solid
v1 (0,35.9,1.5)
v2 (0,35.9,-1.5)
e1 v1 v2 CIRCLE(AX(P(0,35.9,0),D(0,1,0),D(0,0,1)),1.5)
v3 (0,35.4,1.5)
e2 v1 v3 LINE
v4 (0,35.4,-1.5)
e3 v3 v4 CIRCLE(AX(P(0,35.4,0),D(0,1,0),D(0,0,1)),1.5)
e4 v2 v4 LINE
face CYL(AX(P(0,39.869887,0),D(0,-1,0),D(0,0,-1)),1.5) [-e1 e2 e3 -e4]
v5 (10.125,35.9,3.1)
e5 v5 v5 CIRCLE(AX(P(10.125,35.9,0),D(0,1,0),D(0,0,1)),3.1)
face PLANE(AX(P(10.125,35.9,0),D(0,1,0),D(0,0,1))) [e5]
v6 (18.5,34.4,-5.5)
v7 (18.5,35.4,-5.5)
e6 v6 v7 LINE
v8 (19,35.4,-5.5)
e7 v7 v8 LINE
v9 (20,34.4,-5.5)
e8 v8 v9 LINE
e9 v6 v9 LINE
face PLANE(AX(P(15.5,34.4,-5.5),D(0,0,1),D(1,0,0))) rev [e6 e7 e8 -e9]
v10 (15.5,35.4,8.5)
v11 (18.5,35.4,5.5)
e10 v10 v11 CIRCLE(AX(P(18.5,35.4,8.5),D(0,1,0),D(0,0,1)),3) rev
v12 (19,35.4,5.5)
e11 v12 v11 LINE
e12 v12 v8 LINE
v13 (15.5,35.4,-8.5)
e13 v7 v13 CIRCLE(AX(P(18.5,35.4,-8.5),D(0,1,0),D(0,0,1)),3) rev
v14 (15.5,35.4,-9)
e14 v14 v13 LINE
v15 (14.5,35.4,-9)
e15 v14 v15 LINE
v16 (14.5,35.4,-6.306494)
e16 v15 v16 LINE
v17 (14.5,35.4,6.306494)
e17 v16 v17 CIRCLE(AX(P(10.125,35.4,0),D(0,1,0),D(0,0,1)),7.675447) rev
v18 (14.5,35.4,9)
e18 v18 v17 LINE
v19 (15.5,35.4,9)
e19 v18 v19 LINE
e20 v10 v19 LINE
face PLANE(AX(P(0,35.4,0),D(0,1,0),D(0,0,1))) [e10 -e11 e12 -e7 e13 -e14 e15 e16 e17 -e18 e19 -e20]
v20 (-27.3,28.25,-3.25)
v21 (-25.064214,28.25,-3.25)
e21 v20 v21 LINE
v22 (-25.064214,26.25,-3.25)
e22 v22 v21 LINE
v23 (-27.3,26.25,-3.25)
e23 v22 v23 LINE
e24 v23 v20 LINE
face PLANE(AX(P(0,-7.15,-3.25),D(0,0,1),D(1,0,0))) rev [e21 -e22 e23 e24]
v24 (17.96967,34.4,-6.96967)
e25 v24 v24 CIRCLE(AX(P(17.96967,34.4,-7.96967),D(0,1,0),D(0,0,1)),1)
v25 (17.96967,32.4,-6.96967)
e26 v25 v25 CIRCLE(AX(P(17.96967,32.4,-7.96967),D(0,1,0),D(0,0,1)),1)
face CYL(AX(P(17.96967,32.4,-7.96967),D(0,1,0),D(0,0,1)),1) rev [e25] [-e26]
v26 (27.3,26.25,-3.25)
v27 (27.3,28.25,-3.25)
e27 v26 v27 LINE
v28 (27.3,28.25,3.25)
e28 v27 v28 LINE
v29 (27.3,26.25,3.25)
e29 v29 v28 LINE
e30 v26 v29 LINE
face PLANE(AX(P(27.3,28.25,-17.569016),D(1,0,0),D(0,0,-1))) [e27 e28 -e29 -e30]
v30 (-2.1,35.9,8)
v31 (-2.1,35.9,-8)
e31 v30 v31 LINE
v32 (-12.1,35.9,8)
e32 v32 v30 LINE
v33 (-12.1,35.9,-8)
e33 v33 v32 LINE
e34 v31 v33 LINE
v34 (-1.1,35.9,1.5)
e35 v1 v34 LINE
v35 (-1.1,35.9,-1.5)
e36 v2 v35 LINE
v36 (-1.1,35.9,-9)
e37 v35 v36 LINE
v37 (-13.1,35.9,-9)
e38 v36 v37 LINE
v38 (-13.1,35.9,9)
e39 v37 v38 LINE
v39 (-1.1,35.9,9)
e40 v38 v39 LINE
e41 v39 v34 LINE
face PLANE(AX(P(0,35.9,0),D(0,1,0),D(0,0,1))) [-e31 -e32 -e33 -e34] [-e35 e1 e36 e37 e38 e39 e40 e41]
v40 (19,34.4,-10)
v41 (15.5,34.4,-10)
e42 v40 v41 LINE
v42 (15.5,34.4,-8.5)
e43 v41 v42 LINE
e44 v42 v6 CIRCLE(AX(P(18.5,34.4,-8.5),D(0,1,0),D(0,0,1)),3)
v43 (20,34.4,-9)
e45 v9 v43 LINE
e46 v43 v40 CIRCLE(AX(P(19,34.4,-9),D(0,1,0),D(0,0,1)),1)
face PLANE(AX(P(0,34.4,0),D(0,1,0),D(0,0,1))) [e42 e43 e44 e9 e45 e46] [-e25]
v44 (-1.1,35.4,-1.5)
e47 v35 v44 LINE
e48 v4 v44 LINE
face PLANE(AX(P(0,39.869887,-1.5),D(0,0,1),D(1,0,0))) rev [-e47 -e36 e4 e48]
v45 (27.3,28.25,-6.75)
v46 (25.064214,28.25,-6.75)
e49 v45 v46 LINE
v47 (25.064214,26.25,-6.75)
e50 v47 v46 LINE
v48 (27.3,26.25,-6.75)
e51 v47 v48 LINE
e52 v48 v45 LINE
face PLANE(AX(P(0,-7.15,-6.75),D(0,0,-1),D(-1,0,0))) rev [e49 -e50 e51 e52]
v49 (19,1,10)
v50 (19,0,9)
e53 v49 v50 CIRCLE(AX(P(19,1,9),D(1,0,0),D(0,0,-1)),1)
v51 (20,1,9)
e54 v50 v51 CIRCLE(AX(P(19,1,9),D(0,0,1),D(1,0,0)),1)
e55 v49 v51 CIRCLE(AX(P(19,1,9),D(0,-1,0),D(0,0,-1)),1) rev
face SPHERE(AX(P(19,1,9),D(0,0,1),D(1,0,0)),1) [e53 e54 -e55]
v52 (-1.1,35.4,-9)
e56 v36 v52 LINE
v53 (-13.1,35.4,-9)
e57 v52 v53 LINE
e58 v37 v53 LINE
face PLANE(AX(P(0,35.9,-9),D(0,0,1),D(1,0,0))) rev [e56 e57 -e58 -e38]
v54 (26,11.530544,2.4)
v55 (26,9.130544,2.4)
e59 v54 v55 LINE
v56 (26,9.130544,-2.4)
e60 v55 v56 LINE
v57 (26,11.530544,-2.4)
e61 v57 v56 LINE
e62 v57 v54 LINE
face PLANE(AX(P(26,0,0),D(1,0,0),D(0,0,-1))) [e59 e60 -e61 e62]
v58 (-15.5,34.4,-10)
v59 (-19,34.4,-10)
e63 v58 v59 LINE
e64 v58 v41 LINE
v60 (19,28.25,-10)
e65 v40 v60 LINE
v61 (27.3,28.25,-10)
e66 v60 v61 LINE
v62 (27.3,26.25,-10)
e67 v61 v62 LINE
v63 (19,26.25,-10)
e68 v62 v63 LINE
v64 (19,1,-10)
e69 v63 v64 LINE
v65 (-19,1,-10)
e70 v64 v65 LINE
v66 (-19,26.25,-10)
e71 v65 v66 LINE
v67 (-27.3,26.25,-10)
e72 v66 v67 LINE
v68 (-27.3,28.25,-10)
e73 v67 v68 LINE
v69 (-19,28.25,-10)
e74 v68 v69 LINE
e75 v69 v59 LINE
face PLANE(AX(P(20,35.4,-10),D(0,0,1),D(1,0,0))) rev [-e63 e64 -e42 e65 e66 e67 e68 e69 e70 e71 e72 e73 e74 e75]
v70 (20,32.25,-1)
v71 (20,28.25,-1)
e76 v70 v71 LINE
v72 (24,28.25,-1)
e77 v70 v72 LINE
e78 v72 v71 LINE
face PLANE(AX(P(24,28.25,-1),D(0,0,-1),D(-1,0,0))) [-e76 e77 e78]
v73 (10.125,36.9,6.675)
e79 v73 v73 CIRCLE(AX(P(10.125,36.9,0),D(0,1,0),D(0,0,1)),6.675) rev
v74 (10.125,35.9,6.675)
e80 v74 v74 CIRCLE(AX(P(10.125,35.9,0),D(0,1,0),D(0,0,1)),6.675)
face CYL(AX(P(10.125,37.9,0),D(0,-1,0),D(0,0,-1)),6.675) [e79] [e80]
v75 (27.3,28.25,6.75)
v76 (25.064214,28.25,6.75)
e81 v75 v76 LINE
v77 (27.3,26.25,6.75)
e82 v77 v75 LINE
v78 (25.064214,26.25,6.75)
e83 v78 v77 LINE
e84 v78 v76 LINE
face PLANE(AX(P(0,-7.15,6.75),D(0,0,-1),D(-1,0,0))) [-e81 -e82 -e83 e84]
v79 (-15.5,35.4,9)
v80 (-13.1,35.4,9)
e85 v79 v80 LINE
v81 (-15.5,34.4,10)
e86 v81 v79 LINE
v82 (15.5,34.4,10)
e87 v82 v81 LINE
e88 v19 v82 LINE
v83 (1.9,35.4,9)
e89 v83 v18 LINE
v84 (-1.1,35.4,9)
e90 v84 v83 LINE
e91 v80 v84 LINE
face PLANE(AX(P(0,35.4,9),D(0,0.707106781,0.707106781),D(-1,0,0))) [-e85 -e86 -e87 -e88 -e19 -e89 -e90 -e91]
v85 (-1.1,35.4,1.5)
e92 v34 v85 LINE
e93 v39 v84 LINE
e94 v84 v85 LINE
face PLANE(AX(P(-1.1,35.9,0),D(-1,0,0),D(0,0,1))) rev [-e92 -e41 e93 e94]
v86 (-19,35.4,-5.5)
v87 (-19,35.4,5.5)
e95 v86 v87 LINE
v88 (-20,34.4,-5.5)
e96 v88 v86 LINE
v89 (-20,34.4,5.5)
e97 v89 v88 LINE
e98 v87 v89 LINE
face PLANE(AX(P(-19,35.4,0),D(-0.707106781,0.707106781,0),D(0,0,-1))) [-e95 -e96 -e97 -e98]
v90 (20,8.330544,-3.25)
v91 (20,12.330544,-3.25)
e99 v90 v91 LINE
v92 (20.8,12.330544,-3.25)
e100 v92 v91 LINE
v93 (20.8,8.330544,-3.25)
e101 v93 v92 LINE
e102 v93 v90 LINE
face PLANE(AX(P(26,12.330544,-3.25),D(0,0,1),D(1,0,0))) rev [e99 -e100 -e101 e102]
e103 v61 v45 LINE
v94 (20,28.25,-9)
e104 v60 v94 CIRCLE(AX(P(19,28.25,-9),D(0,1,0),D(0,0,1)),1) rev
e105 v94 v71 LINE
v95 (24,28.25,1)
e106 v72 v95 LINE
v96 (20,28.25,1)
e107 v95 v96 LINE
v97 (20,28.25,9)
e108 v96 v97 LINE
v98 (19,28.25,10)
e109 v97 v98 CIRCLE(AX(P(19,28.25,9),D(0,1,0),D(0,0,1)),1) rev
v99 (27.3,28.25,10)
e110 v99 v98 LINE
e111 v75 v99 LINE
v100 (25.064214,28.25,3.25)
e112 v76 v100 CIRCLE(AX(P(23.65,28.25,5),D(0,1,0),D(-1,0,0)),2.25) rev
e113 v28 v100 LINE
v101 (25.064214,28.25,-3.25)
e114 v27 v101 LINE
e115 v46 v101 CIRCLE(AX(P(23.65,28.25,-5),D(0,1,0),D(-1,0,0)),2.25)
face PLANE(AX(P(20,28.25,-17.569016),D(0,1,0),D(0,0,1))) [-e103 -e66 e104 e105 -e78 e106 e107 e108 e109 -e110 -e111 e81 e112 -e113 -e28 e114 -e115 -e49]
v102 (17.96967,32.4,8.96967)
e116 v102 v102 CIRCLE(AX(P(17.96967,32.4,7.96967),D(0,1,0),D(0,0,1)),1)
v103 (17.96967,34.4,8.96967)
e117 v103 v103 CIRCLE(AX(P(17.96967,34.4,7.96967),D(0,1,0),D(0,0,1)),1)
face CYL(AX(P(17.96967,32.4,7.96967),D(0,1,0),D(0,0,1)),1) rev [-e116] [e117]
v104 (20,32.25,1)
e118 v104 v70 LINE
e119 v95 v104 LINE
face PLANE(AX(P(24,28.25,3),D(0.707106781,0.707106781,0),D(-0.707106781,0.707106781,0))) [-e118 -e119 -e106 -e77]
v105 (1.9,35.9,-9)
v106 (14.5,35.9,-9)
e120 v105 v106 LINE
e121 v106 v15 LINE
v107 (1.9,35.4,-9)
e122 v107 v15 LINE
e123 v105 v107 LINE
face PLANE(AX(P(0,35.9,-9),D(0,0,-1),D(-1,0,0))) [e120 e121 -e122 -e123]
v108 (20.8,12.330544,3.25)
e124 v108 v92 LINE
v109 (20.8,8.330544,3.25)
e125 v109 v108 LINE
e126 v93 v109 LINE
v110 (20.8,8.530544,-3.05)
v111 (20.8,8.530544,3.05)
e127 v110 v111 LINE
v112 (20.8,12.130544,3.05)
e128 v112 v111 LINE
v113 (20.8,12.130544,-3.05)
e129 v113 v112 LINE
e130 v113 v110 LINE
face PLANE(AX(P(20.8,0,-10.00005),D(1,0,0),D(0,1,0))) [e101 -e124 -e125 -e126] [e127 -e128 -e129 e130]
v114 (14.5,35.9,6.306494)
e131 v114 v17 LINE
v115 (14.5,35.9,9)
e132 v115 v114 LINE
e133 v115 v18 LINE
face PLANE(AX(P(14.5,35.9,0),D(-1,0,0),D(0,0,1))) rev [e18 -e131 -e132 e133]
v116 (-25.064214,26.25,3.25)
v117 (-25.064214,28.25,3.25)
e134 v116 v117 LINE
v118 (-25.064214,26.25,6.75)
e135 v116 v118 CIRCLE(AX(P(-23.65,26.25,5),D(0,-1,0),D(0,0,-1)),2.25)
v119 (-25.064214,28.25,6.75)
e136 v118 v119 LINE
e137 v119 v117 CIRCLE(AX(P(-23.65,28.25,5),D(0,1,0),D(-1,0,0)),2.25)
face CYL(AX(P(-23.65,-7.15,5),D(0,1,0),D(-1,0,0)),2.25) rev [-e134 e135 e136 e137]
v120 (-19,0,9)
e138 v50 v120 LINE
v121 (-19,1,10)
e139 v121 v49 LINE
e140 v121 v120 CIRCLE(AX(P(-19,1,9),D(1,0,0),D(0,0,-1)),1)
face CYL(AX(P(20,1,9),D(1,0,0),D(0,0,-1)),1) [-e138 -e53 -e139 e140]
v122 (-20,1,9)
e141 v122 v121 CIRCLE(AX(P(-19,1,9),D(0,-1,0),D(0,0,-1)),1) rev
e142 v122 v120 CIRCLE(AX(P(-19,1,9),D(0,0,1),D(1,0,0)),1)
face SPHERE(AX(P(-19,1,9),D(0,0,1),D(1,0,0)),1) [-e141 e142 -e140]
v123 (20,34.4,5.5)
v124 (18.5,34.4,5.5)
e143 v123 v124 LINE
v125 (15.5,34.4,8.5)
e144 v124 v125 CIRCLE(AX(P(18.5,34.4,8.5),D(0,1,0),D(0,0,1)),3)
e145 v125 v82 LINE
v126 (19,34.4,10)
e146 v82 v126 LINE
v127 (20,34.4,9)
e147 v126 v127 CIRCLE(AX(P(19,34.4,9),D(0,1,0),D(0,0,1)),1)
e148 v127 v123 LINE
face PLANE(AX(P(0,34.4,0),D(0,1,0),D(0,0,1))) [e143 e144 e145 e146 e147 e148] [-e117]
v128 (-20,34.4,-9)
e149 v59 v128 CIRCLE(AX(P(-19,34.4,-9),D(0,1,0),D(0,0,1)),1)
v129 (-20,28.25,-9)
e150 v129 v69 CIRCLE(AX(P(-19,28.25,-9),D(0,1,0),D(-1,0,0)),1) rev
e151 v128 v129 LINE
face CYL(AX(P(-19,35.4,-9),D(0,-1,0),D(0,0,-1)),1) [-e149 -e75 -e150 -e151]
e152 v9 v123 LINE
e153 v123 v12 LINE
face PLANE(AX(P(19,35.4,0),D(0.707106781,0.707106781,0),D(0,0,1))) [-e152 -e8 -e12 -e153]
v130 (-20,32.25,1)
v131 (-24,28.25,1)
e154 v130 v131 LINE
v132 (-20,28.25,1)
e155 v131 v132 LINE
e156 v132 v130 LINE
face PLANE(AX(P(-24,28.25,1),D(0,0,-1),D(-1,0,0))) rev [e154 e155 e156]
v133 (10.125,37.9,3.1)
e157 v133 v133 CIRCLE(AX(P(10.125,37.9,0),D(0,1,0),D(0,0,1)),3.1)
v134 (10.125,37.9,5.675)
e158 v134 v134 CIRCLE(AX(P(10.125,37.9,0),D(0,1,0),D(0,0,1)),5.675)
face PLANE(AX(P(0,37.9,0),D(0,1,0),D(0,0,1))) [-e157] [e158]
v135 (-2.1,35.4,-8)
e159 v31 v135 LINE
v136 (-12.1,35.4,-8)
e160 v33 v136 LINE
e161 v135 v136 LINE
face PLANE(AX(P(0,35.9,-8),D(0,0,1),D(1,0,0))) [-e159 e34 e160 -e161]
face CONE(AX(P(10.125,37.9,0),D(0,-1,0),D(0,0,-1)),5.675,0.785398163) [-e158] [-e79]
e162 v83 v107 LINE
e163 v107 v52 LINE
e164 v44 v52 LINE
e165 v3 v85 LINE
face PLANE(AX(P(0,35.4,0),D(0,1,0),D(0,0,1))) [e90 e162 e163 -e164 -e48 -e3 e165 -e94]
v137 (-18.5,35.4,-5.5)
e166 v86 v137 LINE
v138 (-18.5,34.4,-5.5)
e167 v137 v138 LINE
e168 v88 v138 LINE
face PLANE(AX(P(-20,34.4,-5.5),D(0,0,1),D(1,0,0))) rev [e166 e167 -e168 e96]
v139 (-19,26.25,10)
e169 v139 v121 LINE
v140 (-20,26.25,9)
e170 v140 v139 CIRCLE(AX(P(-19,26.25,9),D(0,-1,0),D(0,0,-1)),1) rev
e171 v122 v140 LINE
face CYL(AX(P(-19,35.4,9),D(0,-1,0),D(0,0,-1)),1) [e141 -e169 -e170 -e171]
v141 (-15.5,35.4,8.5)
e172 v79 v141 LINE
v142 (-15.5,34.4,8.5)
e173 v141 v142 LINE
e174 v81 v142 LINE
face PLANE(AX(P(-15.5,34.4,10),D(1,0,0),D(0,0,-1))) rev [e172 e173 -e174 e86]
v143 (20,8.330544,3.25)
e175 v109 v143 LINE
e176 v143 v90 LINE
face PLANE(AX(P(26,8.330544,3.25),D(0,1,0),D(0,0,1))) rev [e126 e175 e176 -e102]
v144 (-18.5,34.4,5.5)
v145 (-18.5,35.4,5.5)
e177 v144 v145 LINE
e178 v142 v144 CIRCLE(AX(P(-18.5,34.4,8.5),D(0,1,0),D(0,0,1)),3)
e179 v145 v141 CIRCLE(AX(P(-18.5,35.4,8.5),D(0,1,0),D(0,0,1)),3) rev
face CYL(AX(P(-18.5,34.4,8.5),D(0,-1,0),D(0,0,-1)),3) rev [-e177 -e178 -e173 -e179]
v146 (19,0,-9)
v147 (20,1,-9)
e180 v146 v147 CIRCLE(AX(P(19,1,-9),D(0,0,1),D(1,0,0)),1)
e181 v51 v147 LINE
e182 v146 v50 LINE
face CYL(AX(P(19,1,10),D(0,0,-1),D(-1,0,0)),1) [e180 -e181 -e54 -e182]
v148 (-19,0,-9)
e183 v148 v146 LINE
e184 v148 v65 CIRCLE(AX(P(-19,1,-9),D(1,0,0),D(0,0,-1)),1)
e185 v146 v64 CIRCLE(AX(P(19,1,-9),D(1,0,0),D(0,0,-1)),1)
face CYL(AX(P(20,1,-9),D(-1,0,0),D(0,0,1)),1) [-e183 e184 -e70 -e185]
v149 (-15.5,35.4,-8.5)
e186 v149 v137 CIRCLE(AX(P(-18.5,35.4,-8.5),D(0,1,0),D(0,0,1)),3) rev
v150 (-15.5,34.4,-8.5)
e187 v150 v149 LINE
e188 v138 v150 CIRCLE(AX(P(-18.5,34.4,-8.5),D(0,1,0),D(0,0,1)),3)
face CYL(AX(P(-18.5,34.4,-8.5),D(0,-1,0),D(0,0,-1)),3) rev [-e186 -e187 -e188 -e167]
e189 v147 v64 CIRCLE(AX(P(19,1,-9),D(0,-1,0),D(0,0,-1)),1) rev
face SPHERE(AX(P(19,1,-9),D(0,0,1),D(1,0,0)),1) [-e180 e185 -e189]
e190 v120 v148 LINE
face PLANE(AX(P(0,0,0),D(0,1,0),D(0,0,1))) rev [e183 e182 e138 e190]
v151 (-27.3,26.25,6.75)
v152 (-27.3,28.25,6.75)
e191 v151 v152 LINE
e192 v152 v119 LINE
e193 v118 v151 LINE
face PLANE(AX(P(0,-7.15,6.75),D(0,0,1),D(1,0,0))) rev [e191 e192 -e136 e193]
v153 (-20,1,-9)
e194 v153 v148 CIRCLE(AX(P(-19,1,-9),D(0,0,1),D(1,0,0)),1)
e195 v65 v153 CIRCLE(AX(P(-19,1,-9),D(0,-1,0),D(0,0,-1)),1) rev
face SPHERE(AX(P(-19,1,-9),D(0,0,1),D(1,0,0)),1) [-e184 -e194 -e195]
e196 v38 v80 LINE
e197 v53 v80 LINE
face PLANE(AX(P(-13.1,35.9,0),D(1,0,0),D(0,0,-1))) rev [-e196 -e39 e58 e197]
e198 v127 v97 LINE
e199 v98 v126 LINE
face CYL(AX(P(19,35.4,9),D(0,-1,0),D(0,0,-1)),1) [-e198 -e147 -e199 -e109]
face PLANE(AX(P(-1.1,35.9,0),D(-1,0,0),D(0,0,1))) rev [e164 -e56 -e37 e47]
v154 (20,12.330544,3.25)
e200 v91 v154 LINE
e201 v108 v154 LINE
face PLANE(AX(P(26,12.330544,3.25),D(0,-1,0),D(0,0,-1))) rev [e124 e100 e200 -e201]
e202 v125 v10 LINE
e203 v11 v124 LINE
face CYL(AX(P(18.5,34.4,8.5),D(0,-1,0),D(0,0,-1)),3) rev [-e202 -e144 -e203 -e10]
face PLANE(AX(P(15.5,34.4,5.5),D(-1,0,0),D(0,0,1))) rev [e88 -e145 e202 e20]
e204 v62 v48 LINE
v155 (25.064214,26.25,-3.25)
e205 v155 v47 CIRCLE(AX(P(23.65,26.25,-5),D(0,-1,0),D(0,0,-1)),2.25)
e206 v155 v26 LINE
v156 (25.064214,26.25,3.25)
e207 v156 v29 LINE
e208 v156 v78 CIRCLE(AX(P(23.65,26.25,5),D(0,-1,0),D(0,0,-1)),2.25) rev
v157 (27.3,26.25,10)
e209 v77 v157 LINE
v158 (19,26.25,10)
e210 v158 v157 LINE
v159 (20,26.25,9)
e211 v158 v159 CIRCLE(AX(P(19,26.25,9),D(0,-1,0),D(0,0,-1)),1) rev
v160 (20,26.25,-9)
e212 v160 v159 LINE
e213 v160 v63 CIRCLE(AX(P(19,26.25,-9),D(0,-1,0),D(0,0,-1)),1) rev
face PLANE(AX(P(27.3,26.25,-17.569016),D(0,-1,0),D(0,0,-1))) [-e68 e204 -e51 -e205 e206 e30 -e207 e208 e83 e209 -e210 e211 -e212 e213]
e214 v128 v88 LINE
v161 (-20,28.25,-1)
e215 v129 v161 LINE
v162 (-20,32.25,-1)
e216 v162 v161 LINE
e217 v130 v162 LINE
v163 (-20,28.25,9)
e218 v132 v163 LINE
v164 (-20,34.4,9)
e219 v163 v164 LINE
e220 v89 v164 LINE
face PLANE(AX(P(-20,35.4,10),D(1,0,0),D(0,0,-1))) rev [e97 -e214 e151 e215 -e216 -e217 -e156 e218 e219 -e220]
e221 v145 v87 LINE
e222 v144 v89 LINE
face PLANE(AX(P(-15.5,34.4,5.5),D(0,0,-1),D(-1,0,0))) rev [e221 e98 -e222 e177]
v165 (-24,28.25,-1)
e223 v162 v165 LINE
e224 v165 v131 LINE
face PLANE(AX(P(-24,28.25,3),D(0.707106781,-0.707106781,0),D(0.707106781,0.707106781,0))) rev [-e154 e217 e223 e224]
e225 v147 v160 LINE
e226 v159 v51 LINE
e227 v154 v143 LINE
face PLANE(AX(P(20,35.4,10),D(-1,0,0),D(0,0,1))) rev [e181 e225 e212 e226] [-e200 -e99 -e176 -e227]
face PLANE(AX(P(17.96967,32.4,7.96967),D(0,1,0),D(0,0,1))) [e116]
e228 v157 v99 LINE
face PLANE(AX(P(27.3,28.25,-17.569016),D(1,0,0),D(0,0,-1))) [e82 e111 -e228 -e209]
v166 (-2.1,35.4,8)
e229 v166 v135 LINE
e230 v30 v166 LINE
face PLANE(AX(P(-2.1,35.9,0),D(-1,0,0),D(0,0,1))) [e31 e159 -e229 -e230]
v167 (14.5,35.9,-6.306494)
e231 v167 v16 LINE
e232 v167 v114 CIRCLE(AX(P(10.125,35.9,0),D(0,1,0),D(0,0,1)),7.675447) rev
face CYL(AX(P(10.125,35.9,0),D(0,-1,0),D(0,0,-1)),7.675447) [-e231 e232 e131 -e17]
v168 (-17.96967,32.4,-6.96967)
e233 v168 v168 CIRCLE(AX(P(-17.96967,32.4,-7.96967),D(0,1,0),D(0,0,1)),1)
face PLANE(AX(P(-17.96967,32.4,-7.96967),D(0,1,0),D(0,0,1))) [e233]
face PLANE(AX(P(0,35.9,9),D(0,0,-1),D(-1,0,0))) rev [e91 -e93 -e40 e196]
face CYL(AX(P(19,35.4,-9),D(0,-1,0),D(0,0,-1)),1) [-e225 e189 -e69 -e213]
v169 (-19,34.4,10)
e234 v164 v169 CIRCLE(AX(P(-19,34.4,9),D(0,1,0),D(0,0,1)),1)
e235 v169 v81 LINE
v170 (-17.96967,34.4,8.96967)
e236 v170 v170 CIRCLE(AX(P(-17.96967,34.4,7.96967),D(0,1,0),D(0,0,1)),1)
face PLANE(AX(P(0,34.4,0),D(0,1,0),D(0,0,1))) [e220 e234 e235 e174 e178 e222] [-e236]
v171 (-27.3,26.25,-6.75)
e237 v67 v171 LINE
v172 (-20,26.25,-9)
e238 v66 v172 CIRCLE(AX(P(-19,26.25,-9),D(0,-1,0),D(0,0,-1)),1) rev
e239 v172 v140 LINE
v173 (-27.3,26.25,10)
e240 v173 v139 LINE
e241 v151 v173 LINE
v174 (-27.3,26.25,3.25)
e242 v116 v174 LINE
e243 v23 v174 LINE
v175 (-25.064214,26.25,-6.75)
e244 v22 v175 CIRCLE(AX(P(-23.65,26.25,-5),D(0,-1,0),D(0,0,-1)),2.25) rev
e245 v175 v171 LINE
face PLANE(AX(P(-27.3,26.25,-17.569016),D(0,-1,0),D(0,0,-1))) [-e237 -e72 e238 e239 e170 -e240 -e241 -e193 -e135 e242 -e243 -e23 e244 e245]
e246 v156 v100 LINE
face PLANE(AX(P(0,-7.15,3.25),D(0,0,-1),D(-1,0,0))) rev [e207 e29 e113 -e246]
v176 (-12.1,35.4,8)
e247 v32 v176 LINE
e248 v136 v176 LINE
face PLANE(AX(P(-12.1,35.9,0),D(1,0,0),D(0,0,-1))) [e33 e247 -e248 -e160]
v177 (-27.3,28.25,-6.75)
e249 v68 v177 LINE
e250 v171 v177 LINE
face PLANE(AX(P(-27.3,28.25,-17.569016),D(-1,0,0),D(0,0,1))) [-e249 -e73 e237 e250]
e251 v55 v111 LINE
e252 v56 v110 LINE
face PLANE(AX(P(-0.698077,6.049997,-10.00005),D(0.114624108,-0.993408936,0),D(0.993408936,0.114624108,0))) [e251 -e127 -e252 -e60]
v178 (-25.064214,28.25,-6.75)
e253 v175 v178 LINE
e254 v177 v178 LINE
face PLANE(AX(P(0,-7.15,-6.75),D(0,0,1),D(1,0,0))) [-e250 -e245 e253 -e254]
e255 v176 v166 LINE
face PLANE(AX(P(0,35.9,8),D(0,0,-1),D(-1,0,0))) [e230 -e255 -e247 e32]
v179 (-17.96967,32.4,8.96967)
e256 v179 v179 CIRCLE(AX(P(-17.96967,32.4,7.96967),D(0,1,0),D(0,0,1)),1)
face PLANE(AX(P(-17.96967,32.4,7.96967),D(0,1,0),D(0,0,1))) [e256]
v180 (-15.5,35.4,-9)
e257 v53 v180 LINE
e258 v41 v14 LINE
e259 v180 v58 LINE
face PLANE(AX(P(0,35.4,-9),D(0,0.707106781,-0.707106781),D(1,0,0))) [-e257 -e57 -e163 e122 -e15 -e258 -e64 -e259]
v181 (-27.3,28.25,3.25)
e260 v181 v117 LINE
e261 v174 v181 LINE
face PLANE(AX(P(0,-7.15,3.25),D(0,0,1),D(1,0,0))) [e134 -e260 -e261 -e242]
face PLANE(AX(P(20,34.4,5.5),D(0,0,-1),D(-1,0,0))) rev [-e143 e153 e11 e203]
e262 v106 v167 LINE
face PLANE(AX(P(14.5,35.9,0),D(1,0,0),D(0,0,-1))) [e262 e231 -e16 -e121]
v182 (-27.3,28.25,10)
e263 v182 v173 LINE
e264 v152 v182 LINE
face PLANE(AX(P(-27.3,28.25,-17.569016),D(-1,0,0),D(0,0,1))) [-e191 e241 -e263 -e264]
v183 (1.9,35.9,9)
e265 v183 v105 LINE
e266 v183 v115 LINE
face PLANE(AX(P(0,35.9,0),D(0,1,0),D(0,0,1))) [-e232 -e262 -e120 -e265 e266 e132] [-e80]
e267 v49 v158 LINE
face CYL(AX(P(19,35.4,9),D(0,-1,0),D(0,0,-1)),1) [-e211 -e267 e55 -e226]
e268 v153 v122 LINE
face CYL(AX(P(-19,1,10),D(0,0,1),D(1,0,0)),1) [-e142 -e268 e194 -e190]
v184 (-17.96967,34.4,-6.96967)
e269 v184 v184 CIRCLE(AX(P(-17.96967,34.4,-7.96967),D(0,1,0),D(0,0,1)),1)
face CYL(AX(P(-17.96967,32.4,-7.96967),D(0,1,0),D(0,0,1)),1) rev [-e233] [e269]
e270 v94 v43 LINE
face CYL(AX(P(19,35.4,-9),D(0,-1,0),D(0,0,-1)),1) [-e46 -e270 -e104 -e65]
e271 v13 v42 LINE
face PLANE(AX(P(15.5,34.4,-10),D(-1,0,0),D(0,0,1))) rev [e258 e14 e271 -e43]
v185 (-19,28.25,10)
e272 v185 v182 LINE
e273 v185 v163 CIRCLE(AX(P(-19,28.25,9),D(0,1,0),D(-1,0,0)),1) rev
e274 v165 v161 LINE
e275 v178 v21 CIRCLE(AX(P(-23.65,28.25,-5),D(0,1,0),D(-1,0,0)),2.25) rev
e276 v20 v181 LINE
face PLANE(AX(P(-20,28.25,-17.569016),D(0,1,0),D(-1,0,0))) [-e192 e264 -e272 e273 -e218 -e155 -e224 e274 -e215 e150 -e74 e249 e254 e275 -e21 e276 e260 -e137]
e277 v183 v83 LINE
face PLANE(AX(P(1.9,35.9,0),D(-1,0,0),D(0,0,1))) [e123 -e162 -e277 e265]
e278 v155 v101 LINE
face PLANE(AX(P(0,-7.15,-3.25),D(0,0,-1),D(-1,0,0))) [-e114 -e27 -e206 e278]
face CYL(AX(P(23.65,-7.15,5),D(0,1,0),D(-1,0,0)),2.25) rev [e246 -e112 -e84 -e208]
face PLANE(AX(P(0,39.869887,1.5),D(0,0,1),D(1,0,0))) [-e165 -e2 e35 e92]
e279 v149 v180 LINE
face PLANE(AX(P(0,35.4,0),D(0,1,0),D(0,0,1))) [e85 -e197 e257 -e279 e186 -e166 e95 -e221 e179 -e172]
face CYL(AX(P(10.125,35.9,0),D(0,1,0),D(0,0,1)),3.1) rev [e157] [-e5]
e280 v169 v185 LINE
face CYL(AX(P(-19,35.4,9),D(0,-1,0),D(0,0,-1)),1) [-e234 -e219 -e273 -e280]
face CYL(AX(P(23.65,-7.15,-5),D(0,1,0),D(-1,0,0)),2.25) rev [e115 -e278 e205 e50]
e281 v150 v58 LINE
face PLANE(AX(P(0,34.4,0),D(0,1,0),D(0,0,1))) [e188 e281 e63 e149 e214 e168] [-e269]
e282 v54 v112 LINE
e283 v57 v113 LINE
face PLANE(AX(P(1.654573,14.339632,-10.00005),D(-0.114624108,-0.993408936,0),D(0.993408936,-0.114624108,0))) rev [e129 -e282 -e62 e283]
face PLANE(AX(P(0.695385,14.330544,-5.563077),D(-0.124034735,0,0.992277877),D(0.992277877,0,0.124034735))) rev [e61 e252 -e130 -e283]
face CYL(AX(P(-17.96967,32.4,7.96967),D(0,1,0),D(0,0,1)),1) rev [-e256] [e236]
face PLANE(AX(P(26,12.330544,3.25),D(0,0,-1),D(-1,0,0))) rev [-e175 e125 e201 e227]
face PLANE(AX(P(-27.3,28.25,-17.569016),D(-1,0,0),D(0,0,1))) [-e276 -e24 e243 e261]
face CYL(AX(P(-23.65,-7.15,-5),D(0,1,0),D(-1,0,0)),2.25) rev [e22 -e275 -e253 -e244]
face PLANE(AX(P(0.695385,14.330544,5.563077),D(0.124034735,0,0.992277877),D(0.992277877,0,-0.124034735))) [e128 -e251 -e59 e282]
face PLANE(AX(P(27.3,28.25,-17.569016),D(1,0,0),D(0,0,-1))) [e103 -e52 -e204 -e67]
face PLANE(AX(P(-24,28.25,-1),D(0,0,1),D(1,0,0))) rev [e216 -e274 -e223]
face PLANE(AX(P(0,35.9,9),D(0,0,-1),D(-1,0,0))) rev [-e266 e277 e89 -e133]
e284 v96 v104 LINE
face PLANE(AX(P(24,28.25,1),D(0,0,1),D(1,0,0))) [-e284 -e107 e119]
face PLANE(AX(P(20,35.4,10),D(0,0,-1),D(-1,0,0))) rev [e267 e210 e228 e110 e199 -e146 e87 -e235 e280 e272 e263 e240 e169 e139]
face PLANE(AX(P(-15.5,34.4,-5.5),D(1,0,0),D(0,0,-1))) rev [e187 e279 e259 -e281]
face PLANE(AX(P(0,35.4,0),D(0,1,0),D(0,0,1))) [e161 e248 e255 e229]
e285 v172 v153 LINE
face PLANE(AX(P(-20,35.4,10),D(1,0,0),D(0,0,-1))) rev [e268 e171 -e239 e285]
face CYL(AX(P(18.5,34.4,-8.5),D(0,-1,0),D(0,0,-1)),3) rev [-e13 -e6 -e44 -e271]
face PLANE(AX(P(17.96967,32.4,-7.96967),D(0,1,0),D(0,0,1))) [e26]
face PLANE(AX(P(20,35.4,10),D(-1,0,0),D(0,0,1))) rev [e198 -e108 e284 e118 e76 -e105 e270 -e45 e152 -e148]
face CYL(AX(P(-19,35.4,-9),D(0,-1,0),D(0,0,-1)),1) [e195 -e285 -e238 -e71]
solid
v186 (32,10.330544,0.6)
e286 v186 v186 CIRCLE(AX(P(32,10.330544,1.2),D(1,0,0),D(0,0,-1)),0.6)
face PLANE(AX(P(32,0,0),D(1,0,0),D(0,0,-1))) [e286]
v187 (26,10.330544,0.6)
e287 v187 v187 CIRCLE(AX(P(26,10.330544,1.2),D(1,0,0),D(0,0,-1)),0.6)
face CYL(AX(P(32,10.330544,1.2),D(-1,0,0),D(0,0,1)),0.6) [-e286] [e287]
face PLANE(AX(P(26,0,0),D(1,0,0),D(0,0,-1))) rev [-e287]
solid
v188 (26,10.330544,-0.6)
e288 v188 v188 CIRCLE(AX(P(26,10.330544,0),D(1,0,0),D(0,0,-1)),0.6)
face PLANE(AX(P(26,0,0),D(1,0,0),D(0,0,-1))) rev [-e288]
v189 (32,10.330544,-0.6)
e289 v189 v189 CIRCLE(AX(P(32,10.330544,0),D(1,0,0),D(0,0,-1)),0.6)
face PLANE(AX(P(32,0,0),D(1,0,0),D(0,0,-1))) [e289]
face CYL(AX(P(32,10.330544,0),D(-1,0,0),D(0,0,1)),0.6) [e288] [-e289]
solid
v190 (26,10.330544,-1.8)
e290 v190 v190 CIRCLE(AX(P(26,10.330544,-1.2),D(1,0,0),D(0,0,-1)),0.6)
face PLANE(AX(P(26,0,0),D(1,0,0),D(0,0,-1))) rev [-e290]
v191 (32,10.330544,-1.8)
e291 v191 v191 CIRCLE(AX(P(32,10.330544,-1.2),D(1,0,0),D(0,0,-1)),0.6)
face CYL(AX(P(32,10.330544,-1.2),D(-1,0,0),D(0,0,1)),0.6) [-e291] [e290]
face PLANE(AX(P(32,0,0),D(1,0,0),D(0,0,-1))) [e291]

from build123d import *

# Parameters (mm, degrees)
SKETCH_1_W           = 40
SKETCH_1_H           = 20
EXTRUDE_1_DEPTH      = 35.4
SKETCH_2_W           = 7.3
SKETCH_2_H           = 2
EXTRUDE_2_DEPTH      = 20
SKETCH_3_R           = 2.25
CUT_EXTRUDE_1_DEPTH  = 35.4
SKETCH_4_R           = 6.675
EXTRUDE_3_DEPTH      = 0.5
SKETCH_4_3_R         = 6.675
EXTRUDE_4_DEPTH      = 2.5
SKETCH_4_5_W         = 12
SKETCH_4_5_H         = 18
SKETCH_4_5_W_2       = 10
SKETCH_4_5_H_2       = 16
EXTRUDE_2_2_DEPTH    = 0.5
EXTRUDE_6_DEPTH      = 0.5
SKETCH_13_W          = 6.5
SKETCH_13_H          = 4
EXTRUDE_8_DEPTH      = 6
CUT_EXTRUDE_5_DEPTH  = 49.551647758
CUT_EXTRUDE_6_DEPTH  = 6
SKETCH_17_R          = 0.6
EXTRUDE_11_DEPTH     = 6
EXTRUDE_11_2_DEPTH   = 6
EXTRUDE_11_3_DEPTH   = 6
SKETCH_18_W          = 2
SKETCH_18_H          = 4
EXTRUDE_12_DEPTH     = 4
CUT_EXTRUDE_7_DEPTH  = 4
CHAMFER_2_SIZE       = 1
SKETCH_21_R          = 3.1
CUT_EXTRUDE_8_DEPTH  = 2
SKETCH_23_W          = 4.5
SKETCH_23_H          = 4.5
CUT_EXTRUDE_9_DEPTH  = 1
FILLET_3_R           = 3
SKETCH_24_R          = 1
CUT_EXTRUDE_10_DEPTH = 2
CHAMFER_3_SIZE       = 1
FILLET_6_R           = 1
FILLET_7_R           = 1


with BuildPart() as part:
    # ｽｹｯﾁ1 → ﾎﾞｽ - 押し出し1 (new body)
    with BuildSketch(Plane(origin=(0, 0, 0), x_dir=(1, 0, 0), z_dir=(0, 1, 0))):
        Rectangle(SKETCH_1_W, SKETCH_1_H)
    extrude_1 = extrude(amount=EXTRUDE_1_DEPTH)

    # ｽｹｯﾁ2 → Extrude 2 (add)
    with BuildSketch(Plane.XY.offset(10)):
        with Locations((23.65, 27.25)):
            Rectangle(SKETCH_2_W, SKETCH_2_H)
        with Locations((-23.65, 27.25)):
            Rectangle(SKETCH_2_W, SKETCH_2_H)
    extrude(amount=-EXTRUDE_2_DEPTH)

    # ｽｹｯﾁ3 → ｶｯﾄ - 押し出し1 (cut)
    with BuildSketch(Plane(origin=(0, 28.25, 0), x_dir=(1, 0, 0), z_dir=(0, 1, 0))):
        with Locations((23.65, -5)):
            Circle(SKETCH_3_R)
        with BuildLine():
            Line((25.064213562, -6.75), (27.3, -6.75))
            Line((27.3, -6.75), (27.3, -3.25))
            Line((27.3, -3.25), (25.064213562, -3.25))
            ThreePointArc((25.064213562, -3.25), (25.680330086, -4.030330086), (25.9, -5))
            ThreePointArc((25.9, -5), (25.680330086, -5.969669914), (25.064213562, -6.75))
        make_face()
        with Locations((23.65, 5)):
            Circle(SKETCH_3_R)
        with BuildLine():
            Line((27.3, 3.25), (27.3, 6.75))
            Line((27.3, 6.75), (25.064213562, 6.75))
            ThreePointArc((25.064213562, 6.75), (25.680330086, 5.969669914), (25.9, 5))
            ThreePointArc((25.9, 5), (25.680330086, 4.030330086), (25.064213562, 3.25))
            Line((25.064213562, 3.25), (27.3, 3.25))
        make_face()
        with Locations((-23.65, -5)):
            Circle(SKETCH_3_R)
        with BuildLine():
            Line((-27.3, -3.25), (-27.3, -6.75))
            Line((-27.3, -6.75), (-25.064213562, -6.75))
            ThreePointArc((-25.064213562, -6.75), (-25.9, -5), (-25.064213562, -3.25))
            Line((-25.064213562, -3.25), (-27.3, -3.25))
        make_face()
        with Locations((-23.65, 5)):
            Circle(SKETCH_3_R)
        with BuildLine():
            Line((-27.3, 6.75), (-27.3, 3.25))
            Line((-27.3, 3.25), (-25.064213562, 3.25))
            ThreePointArc((-25.064213562, 3.25), (-25.9, 5), (-25.064213562, 6.75))
            Line((-25.064213562, 6.75), (-27.3, 6.75))
        make_face()
    extrude(amount=-CUT_EXTRUDE_1_DEPTH, mode=Mode.SUBTRACT)

    # ｽｹｯﾁ4 → ﾎﾞｽ - 押し出し3 (add)
    with BuildSketch(Plane(origin=(0, 35.4, 0), x_dir=(1, 0, 0), z_dir=(0, 1, 0))):
        with BuildLine():
            Line((1.9, -9), (14.5, -9))
            Line((14.5, -9), (14.5, -6.306493844))
            ThreePointArc((14.5, -6.306493844), (17.800447192, 0), (14.5, 6.306493844))
            Line((14.5, 6.306493844), (14.5, 9))
            Line((14.5, 9), (1.9, 9))
            Line((1.9, 9), (1.9, -9))
        make_face()
        with Locations(Location((10.125, 0, 0), (0, 0, 270))):
            Circle(SKETCH_4_R, mode=Mode.SUBTRACT)
    extrude(amount=EXTRUDE_3_DEPTH)

    # ｽｹｯﾁ4<3> → ﾎﾞｽ - 押し出し4 (add)
    with BuildSketch(Plane(origin=(0, 35.4, 0), x_dir=(1, 0, 0), z_dir=(0, 1, 0))):
        with Locations(Location((10.125, 0, 0), (0, 0, 270))):
            Circle(SKETCH_4_3_R)
    extrude(amount=EXTRUDE_4_DEPTH)

    # ｽｹｯﾁ4<5> → Extrude 2 2 (add)
    with BuildSketch(Plane(origin=(0, 35.4, 0), x_dir=(1, 0, 0), z_dir=(0, 1, 0))):
        with Locations((-7.1, 0)):
            Rectangle(SKETCH_4_5_W, SKETCH_4_5_H)
        with Locations((-7.1, 0)):
            Rectangle(SKETCH_4_5_W_2, SKETCH_4_5_H_2, mode=Mode.SUBTRACT)
    extrude(amount=EXTRUDE_2_2_DEPTH)

    # ｽｹｯﾁ4<6> → ﾎﾞｽ - 押し出し6 (add)
    with BuildSketch(Plane(origin=(0, 35.4, 0), x_dir=(1, 0, 0), z_dir=(0, 1, 0))):
        with BuildLine():
            Line((-1.1, 1.5), (-1.1, -1.5))
            Line((-1.1, -1.5), (0, -1.5))
            ThreePointArc((0, -1.5), (1.5, 0), (0, 1.5))
            Line((0, 1.5), (-1.1, 1.5))
        make_face()
    extrude(amount=EXTRUDE_6_DEPTH)

    # ｽｹｯﾁ13 → ﾎﾞｽ - 押し出し8 (add)
    with BuildSketch(Plane(origin=(20, 0, 0), x_dir=(0, 0, -1), z_dir=(1, 0, 0))):
        with Locations((0, 10.330544448)):
            Rectangle(SKETCH_13_W, SKETCH_13_H)
    extrude(amount=EXTRUDE_8_DEPTH)

    # ｽｹｯﾁ14 → ｶｯﾄ - 押し出し5 (cut, through all)
    with BuildSketch(Plane.XY.offset(3.25)):
        Polygon((20.8, 8.530544448), (20.8, 8.330544448), (26, 8.330544448), (26, 9.130544448), align=None)
        Polygon((26, 12.330544448), (20.8, 12.330544448), (20.8, 12.130544448), (26, 11.530544448), align=None)
    extrude(amount=-CUT_EXTRUDE_5_DEPTH, mode=Mode.SUBTRACT)

    # ｽｹｯﾁ15 → ｶｯﾄ - 押し出し6 (cut)
    with BuildSketch(Plane.XZ.offset(-8.330544448)):
        Polygon((20.8, 3.25), (20.8, 3.05), (26, 2.4), (26, 3.25), align=None)
        Polygon((20.8, -3.05), (20.8, -3.25), (26, -3.25), (26, -2.4), align=None)
    extrude(amount=-CUT_EXTRUDE_6_DEPTH, mode=Mode.SUBTRACT)

    # ｽｹｯﾁ18 → ﾎﾞｽ - 押し出し12 (add)
    with BuildSketch(Plane.ZY.offset(20)):
        with Locations((0, 30.25)):
            Rectangle(SKETCH_18_W, SKETCH_18_H)
    extrude_12 = extrude(amount=EXTRUDE_12_DEPTH)

    # ｽｹｯﾁ19 → ｶｯﾄ - 押し出し7 (cut)
    with BuildSketch(Plane(origin=(0, 0, -1), x_dir=(-1, 0, 0), z_dir=(0, 0, -1))):
        Polygon((24, 28.25), (20, 32.25), (24, 32.25), align=None)
    cut_extrude_7 = extrude(amount=-CUT_EXTRUDE_7_DEPTH, mode=Mode.SUBTRACT)

    # ﾐﾗｰ5: ﾎﾞｽ - 押し出し1, ﾎﾞｽ - 押し出し12, ｶｯﾄ - 押し出し7 across plane
    add(extrude_1.mirror(Plane.ZY))
    add(extrude_12.mirror(Plane.ZY))
    add(cut_extrude_7.mirror(Plane.ZY), mode=Mode.SUBTRACT)

    # 面取り2
    chamfer_2_edges = [part.edges().sort_by_distance(p)[0] for p in [
        (10.125, 37.9, -6.675),
    ]]
    chamfer(chamfer_2_edges, length=CHAMFER_2_SIZE)

    # ｽｹｯﾁ21 → ｶｯﾄ - 押し出し8 (cut)
    with BuildSketch(Plane(origin=(0, 37.9, 0), x_dir=(1, 0, 0), z_dir=(0, 1, 0))):
        with Locations(Location((10.125, 0, 0), (0, 0, 270))):
            Circle(SKETCH_21_R)
    extrude(amount=-CUT_EXTRUDE_8_DEPTH, mode=Mode.SUBTRACT)

    # ｽｹｯﾁ23 → ｶｯﾄ - 押し出し9 (cut)
    with BuildSketch(Plane(origin=(0, 35.4, 0), x_dir=(1, 0, 0), z_dir=(0, 1, 0))):
        with Locations((-17.75, -7.75)):
            Rectangle(SKETCH_23_W, SKETCH_23_H)
        with Locations((-17.75, 7.75)):
            Rectangle(SKETCH_23_W, SKETCH_23_H)
        with Locations((17.75, 7.75)):
            Rectangle(SKETCH_23_W, SKETCH_23_H)
        with Locations((17.75, -7.75)):
            Rectangle(SKETCH_23_W, SKETCH_23_H)
    extrude(amount=-CUT_EXTRUDE_9_DEPTH, mode=Mode.SUBTRACT)

    # ﾌｨﾚｯﾄ3
    fillet_3_edges = [part.edges().sort_by_distance(p)[0] for p in [
        (-15.5, 34.9, 5.5),
        (-15.5, 34.9, -5.5),
        (15.5, 34.9, -5.5),
        (15.5, 34.9, 5.5),
    ]]
    fillet(fillet_3_edges, radius=FILLET_3_R)

    # ｽｹｯﾁ24 → ｶｯﾄ - 押し出し10 (cut)
    with BuildSketch(Plane(origin=(0, 34.4, 0), x_dir=(1, 0, 0), z_dir=(0, 1, 0))):
        with Locations(Location((-17.969669914, 7.969669914, 0), (0, 0, 270))):
            Circle(SKETCH_24_R)
        with Locations(Location((-17.969669914, -7.969669914, 0), (0, 0, 270))):
            Circle(SKETCH_24_R)
        with Locations(Location((17.969669914, -7.969669914, 0), (0, 0, 270))):
            Circle(SKETCH_24_R)
        with Locations(Location((17.969669914, 7.969669914, 0), (0, 0, 270))):
            Circle(SKETCH_24_R)
    extrude(amount=-CUT_EXTRUDE_10_DEPTH, mode=Mode.SUBTRACT)

    # 面取り3
    chamfer_3_edges = [part.edges().sort_by_distance(p)[0] for p in [
        (20, 35.4, 0),
        (0, 35.4, 10),
        (-20, 35.4, 0),
        (0, 35.4, -10),
    ]]
    chamfer(chamfer_3_edges, length=CHAMFER_3_SIZE - 0.0001)  # a hair under: the kernel refuses the full size

    # ﾌｨﾚｯﾄ6
    fillet_6_edges = [part.edges().sort_by_distance(p)[0] for p in [
        (20, 13.125, 10),
        (20, 31.325, 10),
        (-20, 13.125, 10),
        (-20, 31.325, 10),
        (-20, 13.125, -10),
        (-20, 31.325, -10),
        (20, 31.325, -10),
        (20, 13.125, -10),
    ]]
    fillet(fillet_6_edges, radius=FILLET_6_R)

    # ﾌｨﾚｯﾄ7
    fillet_7_edges = [part.edges().sort_by_distance(p)[0] for p in [
        (20, 0, 0),
        (-20, 0, 0),
        (0, 0, -10),
        (0, 0, 10),
        (19.707106781, 0, -9.707106781),
        (-19.707106781, 0, -9.707106781),
        (-19.707106781, 0, 9.707106781),
        (19.707106781, 0, 9.707106781),
    ]]
    fillet(fillet_7_edges, radius=FILLET_7_R)


with BuildPart() as body_2:
    # ｽｹｯﾁ17 → ﾎﾞｽ - 押し出し11 (new body)
    with BuildSketch(Plane(origin=(26, 0, 0), x_dir=(0, 0, -1), z_dir=(1, 0, 0))):
        with Locations((-1.2, 10.330544448)):
            Circle(SKETCH_17_R)
    extrude(amount=EXTRUDE_11_DEPTH)


with BuildPart() as body_3:
    # ｽｹｯﾁ17 → Extrude 11 2 (new body)
    with BuildSketch(Plane(origin=(26, 0, 0), x_dir=(0, 0, -1), z_dir=(1, 0, 0))):
        with Locations((0, 10.330544448)):
            Circle(SKETCH_17_R)
    extrude(amount=EXTRUDE_11_2_DEPTH)


with BuildPart() as body_4:
    # ｽｹｯﾁ17 → Extrude 11 3 (new body)
    with BuildSketch(Plane(origin=(26, 0, 0), x_dir=(0, 0, -1), z_dir=(1, 0, 0))):
        with Locations((1.2, 10.330544448)):
            Circle(SKETCH_17_R)
    extrude(amount=EXTRUDE_11_3_DEPTH)


solid = Compound([part.part, body_2.part, body_3.part, body_4.part])
